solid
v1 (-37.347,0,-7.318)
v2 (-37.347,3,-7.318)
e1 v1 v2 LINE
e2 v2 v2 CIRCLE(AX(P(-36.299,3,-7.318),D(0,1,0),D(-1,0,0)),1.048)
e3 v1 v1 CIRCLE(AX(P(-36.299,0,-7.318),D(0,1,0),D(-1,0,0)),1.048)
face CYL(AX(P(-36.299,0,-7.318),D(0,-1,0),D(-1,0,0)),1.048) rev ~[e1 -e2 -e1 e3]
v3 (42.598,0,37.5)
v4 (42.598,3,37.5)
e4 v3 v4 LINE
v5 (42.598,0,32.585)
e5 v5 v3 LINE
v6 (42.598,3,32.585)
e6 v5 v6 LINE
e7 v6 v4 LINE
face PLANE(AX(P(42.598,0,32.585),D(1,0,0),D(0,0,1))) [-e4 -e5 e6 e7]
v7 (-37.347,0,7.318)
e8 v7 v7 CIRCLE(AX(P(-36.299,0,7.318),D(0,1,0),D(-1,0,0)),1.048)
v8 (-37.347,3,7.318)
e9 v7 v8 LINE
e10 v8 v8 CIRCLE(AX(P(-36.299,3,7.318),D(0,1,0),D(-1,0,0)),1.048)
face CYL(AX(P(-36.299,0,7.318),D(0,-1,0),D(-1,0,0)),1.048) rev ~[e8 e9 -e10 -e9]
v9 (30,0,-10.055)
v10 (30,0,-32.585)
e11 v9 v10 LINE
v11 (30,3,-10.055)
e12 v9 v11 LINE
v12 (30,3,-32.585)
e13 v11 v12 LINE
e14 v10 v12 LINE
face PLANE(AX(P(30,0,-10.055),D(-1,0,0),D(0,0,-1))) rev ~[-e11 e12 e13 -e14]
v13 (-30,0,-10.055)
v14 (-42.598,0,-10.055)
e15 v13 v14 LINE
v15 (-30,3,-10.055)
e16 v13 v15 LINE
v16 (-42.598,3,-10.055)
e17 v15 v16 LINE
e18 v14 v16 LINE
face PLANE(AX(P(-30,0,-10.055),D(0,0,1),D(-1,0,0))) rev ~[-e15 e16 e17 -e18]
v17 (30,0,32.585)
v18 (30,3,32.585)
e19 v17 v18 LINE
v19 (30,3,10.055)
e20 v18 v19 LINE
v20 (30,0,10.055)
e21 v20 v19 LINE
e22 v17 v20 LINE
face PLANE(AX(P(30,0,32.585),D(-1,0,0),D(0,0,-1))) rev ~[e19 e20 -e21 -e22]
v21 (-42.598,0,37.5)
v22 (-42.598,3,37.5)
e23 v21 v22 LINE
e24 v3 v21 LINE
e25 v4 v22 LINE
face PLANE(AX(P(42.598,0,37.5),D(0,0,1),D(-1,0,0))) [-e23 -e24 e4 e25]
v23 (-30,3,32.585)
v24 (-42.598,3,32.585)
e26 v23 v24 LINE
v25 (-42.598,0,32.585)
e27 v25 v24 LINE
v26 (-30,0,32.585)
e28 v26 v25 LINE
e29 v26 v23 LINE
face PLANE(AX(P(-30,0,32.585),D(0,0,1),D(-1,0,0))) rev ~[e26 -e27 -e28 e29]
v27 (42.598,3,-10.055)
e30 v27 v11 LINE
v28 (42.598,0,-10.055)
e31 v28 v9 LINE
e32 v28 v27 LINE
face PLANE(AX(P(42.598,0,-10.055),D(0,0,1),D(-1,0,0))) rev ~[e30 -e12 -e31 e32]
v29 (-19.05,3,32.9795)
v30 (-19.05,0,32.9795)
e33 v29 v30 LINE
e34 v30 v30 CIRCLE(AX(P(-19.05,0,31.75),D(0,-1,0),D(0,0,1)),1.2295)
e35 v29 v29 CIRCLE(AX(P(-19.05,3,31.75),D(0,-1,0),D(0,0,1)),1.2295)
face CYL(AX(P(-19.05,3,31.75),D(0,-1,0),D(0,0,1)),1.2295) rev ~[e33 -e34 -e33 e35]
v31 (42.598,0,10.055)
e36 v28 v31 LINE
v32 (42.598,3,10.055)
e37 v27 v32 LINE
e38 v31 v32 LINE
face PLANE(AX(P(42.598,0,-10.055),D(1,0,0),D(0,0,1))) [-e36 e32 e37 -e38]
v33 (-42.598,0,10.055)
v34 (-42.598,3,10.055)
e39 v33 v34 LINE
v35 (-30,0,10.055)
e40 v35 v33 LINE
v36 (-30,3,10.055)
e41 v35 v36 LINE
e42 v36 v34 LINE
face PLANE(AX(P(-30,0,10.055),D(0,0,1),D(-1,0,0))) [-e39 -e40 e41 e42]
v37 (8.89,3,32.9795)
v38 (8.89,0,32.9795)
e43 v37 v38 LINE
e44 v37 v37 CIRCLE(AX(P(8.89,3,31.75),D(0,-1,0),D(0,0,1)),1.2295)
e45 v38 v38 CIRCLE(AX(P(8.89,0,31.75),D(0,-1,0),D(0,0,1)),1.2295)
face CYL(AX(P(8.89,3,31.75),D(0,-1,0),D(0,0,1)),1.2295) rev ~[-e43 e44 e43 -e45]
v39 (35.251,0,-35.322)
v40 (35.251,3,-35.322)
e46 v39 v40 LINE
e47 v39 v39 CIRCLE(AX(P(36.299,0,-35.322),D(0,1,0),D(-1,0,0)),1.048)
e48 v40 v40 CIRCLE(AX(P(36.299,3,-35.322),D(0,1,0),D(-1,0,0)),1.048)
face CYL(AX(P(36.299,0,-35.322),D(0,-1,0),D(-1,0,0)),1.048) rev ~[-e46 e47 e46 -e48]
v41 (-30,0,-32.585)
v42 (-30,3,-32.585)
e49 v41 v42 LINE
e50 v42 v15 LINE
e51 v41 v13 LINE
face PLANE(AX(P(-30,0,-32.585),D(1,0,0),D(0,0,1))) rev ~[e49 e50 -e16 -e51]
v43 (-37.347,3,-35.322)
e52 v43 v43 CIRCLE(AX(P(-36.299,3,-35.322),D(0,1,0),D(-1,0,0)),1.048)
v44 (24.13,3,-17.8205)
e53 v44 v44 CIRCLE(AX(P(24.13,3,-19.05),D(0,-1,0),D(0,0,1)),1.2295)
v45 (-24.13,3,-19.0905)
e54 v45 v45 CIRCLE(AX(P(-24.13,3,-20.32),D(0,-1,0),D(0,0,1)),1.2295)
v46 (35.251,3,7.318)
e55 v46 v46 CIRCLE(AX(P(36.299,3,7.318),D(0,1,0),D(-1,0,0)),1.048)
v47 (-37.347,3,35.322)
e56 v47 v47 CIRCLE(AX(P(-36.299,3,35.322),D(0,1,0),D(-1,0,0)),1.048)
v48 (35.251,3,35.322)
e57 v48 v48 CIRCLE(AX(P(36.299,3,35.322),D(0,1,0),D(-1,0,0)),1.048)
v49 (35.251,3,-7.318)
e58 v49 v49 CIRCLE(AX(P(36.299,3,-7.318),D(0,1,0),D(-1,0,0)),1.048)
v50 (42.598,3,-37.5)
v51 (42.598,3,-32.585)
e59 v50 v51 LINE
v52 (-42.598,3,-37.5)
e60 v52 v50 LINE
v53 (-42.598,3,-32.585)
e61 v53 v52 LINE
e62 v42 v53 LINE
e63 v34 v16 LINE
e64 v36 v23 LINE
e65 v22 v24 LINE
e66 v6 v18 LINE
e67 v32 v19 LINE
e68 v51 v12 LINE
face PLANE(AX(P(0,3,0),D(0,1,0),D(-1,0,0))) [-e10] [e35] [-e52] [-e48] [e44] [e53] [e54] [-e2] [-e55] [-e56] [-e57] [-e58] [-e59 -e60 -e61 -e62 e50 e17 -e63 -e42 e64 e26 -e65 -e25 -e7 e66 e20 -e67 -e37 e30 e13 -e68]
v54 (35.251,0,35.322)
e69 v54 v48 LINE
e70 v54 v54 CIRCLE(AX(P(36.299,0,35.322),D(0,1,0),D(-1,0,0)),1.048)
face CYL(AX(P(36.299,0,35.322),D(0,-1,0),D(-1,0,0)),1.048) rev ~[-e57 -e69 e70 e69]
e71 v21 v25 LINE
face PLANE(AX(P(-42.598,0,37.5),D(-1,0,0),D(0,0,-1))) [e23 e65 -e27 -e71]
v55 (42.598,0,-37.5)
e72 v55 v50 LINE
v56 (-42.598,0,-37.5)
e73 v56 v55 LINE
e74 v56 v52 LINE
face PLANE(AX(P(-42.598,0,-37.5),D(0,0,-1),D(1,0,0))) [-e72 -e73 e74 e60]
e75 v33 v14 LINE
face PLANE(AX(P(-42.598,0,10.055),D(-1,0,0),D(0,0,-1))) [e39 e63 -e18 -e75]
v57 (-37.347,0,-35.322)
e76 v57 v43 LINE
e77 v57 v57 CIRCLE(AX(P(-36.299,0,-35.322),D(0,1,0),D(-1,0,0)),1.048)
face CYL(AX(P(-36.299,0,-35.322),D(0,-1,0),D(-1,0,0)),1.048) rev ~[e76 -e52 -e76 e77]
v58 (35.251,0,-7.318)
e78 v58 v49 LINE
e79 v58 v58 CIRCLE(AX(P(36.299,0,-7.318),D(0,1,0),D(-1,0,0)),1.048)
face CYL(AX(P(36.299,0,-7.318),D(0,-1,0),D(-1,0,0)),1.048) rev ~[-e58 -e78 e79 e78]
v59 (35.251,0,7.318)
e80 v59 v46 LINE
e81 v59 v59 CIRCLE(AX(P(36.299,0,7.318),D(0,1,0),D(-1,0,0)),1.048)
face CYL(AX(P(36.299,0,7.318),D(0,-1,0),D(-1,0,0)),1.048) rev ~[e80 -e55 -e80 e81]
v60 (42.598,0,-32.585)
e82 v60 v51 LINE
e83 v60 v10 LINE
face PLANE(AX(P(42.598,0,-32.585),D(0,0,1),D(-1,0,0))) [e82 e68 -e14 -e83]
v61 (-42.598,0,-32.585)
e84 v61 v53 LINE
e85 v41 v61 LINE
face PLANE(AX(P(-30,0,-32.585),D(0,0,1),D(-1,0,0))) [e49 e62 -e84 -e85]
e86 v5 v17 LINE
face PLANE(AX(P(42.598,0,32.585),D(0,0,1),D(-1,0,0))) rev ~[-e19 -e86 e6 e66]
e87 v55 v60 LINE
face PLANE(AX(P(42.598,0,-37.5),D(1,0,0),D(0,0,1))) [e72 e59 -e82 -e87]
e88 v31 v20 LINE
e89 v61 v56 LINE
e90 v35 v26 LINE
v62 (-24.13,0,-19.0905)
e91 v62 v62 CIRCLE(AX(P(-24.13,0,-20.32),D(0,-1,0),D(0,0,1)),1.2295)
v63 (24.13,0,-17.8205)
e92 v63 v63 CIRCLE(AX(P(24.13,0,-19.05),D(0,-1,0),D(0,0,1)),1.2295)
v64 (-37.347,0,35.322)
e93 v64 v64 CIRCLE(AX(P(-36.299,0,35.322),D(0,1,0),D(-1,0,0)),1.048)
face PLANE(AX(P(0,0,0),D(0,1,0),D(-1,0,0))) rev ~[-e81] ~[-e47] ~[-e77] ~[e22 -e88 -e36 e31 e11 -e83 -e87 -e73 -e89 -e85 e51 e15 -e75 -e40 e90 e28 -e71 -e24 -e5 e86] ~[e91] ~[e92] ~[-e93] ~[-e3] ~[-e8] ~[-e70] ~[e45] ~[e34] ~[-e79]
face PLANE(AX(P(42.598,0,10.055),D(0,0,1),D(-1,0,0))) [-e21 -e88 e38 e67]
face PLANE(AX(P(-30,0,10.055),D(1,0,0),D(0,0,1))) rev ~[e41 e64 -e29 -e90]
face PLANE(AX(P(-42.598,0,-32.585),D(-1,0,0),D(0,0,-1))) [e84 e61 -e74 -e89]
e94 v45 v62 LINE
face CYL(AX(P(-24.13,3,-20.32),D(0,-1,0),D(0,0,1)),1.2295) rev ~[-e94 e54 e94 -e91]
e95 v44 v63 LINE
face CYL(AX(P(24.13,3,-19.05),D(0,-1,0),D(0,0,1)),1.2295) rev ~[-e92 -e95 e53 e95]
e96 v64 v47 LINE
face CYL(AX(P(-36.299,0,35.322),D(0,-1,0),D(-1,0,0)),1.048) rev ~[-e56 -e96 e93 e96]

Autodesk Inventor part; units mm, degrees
ref_plane "YZ Plane" through (0, 0, 0) normal (1, 0, 0) x (0, 1, 0)
ref_plane "XZ Plane" through (0, 0, 0) normal (0, 1, 0) x (-1, 0, 0)
ref_plane "XY Plane" through (0, 0, 0) normal (0, 0, 1) x (1, 0, 0)
sketch "Servo Hole" plane through (0, 0, 0) normal (0, 0, 1) x (1, 0, 0)
  line L0 (-67.0819, 53.6212) -> (-54.4839, 53.6212) construction
  line L1 (-54.4839, 53.6212) -> (-54.4839, 48.7062) construction
  line L2 (-54.4839, 21.2612) -> (-67.0819, 21.2612) construction
  circle A0 centre (-60.7829, 51.4432) radius 1.048
  line L3 (-67.0819, 48.7062) -> (-54.4839, 48.7062)
  line L4 (-67.0819, 26.1762) -> (-54.4839, 26.1762)
  line L5 (-54.4839, 37.4412) -> (-67.0819, 37.4412) construction
  line L6 (-54.4839, 48.7062) -> (-54.4839, 26.1762)
  line L7 (-54.4839, 26.1762) -> (-54.4839, 21.2612) construction
  line L8 (-67.0819, 48.7062) -> (-67.0819, 53.6212) construction
  line L9 (-67.0819, 26.1762) -> (-67.0819, 48.7062)
  line L10 (-67.0819, 21.2612) -> (-67.0819, 26.1762) construction
  line L11 (-60.7829, 53.6212) -> (-60.7829, 21.2612) construction
  circle A1 centre (-60.7829, 23.4392) radius 1.048
  point P0 (-60.7829, 37.4412)
  dimension "d0" = 32.36
  dimension "d2" = 2.178
  dimension "d3" = 2.096
  dimension "d4" = 22.53
  dimension "d5" = 2.096
  dimension "d6" = 2.178
sketch "Sketch1" plane through (0, 0, 0) normal (0, 1, 0) x (-1, 0, 0)
  line L0 (-42.598, 37.5) -> (42.598, 37.5)
  line L1 (42.598, 37.5) -> (42.598, -37.5)
  line L2 (42.598, -37.5) -> (-42.598, -37.5)
  line L3 (-42.598, -37.5) -> (-42.598, 37.5)
  line L4 (-42.598, 0) -> (42.598, 0) construction
  line L5 (0, 37.5) -> (0, -37.5) construction
  line L6 (-42.598, 37.5) -> (-30, 37.5) construction
  line L7 (-30, 37.5) -> (-30, 32.585) construction
  line L8 (-30, 5.14) -> (-42.598, 5.14) construction
  circle A0 centre (-36.299, 35.322) radius 1.048
  line L9 (-42.598, 32.585) -> (-30, 32.585)
  line L10 (-42.598, 10.055) -> (-30, 10.055)
  line L11 (-30, 21.32) -> (-42.598, 21.32) construction
  line L12 (-30, 32.585) -> (-30, 10.055)
  line L13 (-30, 10.055) -> (-30, 5.14) construction
  line L14 (-42.598, 32.585) -> (-42.598, 37.5) construction
  line L15 (-42.598, 10.055) -> (-42.598, 32.585)
  line L16 (-42.598, 5.14) -> (-42.598, 10.055) construction
  line L17 (-36.299, 37.5) -> (-36.299, 5.14) construction
  circle A1 centre (-36.299, 7.318) radius 1.048
  line L18 (30, 37.5) -> (42.598, 37.5) construction
  line L19 (42.598, 37.5) -> (42.598, 32.585) construction
  line L20 (42.598, 5.14) -> (30, 5.14) construction
  circle A2 centre (36.299, 35.322) radius 1.048
  line L21 (30, 32.585) -> (42.598, 32.585)
  line L22 (30, 10.055) -> (42.598, 10.055)
  line L23 (42.598, 21.32) -> (30, 21.32) construction
  line L24 (42.598, 32.585) -> (42.598, 10.055)
  line L25 (42.598, 10.055) -> (42.598, 5.14) construction
  line L26 (30, 32.585) -> (30, 37.5) construction
  line L27 (30, 10.055) -> (30, 32.585)
  line L28 (30, 5.14) -> (30, 10.055) construction
  line L29 (36.299, 37.5) -> (36.299, 5.14) construction
  circle A3 centre (36.299, 7.318) radius 1.048
  line L30 (-42.598, -5.14) -> (-30, -5.14) construction
  line L31 (-30, -5.14) -> (-30, -10.055) construction
  line L32 (-30, -37.5) -> (-42.598, -37.5) construction
  circle A4 centre (-36.299, -7.318) radius 1.048
  line L33 (-42.598, -10.055) -> (-30, -10.055)
  line L34 (-42.598, -32.585) -> (-30, -32.585)
  line L35 (-30, -21.32) -> (-42.598, -21.32) construction
  line L36 (-30, -10.055) -> (-30, -32.585)
  line L37 (-30, -32.585) -> (-30, -37.5) construction
  line L38 (-42.598, -10.055) -> (-42.598, -5.14) construction
  line L39 (-42.598, -32.585) -> (-42.598, -10.055)
  line L40 (-42.598, -37.5) -> (-42.598, -32.585) construction
  line L41 (-36.299, -5.14) -> (-36.299, -37.5) construction
  circle A5 centre (-36.299, -35.322) radius 1.048
  line L42 (30, -5.14) -> (42.598, -5.14) construction
  line L43 (42.598, -5.14) -> (42.598, -10.055) construction
  line L44 (42.598, -37.5) -> (30, -37.5) construction
  circle A6 centre (36.299, -7.318) radius 1.048
  line L45 (30, -10.055) -> (42.598, -10.055)
  line L46 (30, -32.585) -> (42.598, -32.585)
  line L47 (42.598, -21.32) -> (30, -21.32) construction
  line L48 (42.598, -10.055) -> (42.598, -32.585)
  line L49 (42.598, -32.585) -> (42.598, -37.5) construction
  line L50 (30, -10.055) -> (30, -5.14) construction
  line L51 (30, -32.585) -> (30, -10.055)
  line L52 (30, -37.5) -> (30, -32.585) construction
  line L53 (36.299, -5.14) -> (36.299, -37.5) construction
  circle A7 centre (36.299, -35.322) radius 1.048
  point P0 (0, 0)
  point P1 (0, 0)
  dimension "d12" = 60
  dimension "d8" = 85.196
  dimension "d9" = 75
extrude "Extrusion1" add sketch "Sketch1" along normal blind 3 contours L0 L1 L21 L27 L22 L45 L51 L46 L2 L3 L34 L36 L33 L10 L12 L9
sketch "Sketch2" plane through (0, 3, 0) normal (0, 1, 0) x (1, 0, 0)
  line L0 (-42.598, 10.055) -> (-42.598, -10.055) projected
  line L1 (-42.598, -37.5) -> (42.598, -37.5) projected
  line L2 (42.598, -10.055) -> (42.598, 10.055) projected
  line L3 (42.598, 37.5) -> (-42.598, 37.5) projected
  line L4 (26.67, -34.29) -> (-26.67, -34.29)
  line L5 (-26.67, -34.29) -> (-26.67, 34.29)
  line L6 (-26.67, 34.29) -> (26.67, 34.29)
  line L7 (26.67, 34.29) -> (26.67, -34.29)
  circle A0 centre (-24.13, 20.32) radius 1.5
  circle A1 centre (-19.05, -31.75) radius 1.5
  circle A2 centre (24.13, 19.05) radius 1.5
  line L8 (0, 37.5) -> (0, -37.5) construction
  line L9 (42.598, 0) -> (-42.598, 0) construction
  circle A3 centre (8.89, -31.75) radius 1.5
  point P0 (0, 0)
  dimension "d18" = 3
  dimension "d19" = 2.54
  dimension "d20" = 13.97
  dimension "d21" = 53.34
  dimension "d22" = 68.58
  dimension "d23" = 3
  dimension "d24" = 7.62
  dimension "d25" = 2.54
  dimension "d28" = 3
  dimension "d29" = 2.54
  dimension "d30" = 15.24
  dimension "d31" = 3
  dimension "d32" = 27.94
hole "Hole1" at (-24.13, 3, -20.32) at (24.13, 3, -19.05) at (8.89, 3, 31.75) at (-19.05, 3, 31.75) direction (0, -1, 0) diameter 2.459 end through all thread size "M3x0.5" class "6H" standard "ISO Metric profile"
properties part number "Base"
